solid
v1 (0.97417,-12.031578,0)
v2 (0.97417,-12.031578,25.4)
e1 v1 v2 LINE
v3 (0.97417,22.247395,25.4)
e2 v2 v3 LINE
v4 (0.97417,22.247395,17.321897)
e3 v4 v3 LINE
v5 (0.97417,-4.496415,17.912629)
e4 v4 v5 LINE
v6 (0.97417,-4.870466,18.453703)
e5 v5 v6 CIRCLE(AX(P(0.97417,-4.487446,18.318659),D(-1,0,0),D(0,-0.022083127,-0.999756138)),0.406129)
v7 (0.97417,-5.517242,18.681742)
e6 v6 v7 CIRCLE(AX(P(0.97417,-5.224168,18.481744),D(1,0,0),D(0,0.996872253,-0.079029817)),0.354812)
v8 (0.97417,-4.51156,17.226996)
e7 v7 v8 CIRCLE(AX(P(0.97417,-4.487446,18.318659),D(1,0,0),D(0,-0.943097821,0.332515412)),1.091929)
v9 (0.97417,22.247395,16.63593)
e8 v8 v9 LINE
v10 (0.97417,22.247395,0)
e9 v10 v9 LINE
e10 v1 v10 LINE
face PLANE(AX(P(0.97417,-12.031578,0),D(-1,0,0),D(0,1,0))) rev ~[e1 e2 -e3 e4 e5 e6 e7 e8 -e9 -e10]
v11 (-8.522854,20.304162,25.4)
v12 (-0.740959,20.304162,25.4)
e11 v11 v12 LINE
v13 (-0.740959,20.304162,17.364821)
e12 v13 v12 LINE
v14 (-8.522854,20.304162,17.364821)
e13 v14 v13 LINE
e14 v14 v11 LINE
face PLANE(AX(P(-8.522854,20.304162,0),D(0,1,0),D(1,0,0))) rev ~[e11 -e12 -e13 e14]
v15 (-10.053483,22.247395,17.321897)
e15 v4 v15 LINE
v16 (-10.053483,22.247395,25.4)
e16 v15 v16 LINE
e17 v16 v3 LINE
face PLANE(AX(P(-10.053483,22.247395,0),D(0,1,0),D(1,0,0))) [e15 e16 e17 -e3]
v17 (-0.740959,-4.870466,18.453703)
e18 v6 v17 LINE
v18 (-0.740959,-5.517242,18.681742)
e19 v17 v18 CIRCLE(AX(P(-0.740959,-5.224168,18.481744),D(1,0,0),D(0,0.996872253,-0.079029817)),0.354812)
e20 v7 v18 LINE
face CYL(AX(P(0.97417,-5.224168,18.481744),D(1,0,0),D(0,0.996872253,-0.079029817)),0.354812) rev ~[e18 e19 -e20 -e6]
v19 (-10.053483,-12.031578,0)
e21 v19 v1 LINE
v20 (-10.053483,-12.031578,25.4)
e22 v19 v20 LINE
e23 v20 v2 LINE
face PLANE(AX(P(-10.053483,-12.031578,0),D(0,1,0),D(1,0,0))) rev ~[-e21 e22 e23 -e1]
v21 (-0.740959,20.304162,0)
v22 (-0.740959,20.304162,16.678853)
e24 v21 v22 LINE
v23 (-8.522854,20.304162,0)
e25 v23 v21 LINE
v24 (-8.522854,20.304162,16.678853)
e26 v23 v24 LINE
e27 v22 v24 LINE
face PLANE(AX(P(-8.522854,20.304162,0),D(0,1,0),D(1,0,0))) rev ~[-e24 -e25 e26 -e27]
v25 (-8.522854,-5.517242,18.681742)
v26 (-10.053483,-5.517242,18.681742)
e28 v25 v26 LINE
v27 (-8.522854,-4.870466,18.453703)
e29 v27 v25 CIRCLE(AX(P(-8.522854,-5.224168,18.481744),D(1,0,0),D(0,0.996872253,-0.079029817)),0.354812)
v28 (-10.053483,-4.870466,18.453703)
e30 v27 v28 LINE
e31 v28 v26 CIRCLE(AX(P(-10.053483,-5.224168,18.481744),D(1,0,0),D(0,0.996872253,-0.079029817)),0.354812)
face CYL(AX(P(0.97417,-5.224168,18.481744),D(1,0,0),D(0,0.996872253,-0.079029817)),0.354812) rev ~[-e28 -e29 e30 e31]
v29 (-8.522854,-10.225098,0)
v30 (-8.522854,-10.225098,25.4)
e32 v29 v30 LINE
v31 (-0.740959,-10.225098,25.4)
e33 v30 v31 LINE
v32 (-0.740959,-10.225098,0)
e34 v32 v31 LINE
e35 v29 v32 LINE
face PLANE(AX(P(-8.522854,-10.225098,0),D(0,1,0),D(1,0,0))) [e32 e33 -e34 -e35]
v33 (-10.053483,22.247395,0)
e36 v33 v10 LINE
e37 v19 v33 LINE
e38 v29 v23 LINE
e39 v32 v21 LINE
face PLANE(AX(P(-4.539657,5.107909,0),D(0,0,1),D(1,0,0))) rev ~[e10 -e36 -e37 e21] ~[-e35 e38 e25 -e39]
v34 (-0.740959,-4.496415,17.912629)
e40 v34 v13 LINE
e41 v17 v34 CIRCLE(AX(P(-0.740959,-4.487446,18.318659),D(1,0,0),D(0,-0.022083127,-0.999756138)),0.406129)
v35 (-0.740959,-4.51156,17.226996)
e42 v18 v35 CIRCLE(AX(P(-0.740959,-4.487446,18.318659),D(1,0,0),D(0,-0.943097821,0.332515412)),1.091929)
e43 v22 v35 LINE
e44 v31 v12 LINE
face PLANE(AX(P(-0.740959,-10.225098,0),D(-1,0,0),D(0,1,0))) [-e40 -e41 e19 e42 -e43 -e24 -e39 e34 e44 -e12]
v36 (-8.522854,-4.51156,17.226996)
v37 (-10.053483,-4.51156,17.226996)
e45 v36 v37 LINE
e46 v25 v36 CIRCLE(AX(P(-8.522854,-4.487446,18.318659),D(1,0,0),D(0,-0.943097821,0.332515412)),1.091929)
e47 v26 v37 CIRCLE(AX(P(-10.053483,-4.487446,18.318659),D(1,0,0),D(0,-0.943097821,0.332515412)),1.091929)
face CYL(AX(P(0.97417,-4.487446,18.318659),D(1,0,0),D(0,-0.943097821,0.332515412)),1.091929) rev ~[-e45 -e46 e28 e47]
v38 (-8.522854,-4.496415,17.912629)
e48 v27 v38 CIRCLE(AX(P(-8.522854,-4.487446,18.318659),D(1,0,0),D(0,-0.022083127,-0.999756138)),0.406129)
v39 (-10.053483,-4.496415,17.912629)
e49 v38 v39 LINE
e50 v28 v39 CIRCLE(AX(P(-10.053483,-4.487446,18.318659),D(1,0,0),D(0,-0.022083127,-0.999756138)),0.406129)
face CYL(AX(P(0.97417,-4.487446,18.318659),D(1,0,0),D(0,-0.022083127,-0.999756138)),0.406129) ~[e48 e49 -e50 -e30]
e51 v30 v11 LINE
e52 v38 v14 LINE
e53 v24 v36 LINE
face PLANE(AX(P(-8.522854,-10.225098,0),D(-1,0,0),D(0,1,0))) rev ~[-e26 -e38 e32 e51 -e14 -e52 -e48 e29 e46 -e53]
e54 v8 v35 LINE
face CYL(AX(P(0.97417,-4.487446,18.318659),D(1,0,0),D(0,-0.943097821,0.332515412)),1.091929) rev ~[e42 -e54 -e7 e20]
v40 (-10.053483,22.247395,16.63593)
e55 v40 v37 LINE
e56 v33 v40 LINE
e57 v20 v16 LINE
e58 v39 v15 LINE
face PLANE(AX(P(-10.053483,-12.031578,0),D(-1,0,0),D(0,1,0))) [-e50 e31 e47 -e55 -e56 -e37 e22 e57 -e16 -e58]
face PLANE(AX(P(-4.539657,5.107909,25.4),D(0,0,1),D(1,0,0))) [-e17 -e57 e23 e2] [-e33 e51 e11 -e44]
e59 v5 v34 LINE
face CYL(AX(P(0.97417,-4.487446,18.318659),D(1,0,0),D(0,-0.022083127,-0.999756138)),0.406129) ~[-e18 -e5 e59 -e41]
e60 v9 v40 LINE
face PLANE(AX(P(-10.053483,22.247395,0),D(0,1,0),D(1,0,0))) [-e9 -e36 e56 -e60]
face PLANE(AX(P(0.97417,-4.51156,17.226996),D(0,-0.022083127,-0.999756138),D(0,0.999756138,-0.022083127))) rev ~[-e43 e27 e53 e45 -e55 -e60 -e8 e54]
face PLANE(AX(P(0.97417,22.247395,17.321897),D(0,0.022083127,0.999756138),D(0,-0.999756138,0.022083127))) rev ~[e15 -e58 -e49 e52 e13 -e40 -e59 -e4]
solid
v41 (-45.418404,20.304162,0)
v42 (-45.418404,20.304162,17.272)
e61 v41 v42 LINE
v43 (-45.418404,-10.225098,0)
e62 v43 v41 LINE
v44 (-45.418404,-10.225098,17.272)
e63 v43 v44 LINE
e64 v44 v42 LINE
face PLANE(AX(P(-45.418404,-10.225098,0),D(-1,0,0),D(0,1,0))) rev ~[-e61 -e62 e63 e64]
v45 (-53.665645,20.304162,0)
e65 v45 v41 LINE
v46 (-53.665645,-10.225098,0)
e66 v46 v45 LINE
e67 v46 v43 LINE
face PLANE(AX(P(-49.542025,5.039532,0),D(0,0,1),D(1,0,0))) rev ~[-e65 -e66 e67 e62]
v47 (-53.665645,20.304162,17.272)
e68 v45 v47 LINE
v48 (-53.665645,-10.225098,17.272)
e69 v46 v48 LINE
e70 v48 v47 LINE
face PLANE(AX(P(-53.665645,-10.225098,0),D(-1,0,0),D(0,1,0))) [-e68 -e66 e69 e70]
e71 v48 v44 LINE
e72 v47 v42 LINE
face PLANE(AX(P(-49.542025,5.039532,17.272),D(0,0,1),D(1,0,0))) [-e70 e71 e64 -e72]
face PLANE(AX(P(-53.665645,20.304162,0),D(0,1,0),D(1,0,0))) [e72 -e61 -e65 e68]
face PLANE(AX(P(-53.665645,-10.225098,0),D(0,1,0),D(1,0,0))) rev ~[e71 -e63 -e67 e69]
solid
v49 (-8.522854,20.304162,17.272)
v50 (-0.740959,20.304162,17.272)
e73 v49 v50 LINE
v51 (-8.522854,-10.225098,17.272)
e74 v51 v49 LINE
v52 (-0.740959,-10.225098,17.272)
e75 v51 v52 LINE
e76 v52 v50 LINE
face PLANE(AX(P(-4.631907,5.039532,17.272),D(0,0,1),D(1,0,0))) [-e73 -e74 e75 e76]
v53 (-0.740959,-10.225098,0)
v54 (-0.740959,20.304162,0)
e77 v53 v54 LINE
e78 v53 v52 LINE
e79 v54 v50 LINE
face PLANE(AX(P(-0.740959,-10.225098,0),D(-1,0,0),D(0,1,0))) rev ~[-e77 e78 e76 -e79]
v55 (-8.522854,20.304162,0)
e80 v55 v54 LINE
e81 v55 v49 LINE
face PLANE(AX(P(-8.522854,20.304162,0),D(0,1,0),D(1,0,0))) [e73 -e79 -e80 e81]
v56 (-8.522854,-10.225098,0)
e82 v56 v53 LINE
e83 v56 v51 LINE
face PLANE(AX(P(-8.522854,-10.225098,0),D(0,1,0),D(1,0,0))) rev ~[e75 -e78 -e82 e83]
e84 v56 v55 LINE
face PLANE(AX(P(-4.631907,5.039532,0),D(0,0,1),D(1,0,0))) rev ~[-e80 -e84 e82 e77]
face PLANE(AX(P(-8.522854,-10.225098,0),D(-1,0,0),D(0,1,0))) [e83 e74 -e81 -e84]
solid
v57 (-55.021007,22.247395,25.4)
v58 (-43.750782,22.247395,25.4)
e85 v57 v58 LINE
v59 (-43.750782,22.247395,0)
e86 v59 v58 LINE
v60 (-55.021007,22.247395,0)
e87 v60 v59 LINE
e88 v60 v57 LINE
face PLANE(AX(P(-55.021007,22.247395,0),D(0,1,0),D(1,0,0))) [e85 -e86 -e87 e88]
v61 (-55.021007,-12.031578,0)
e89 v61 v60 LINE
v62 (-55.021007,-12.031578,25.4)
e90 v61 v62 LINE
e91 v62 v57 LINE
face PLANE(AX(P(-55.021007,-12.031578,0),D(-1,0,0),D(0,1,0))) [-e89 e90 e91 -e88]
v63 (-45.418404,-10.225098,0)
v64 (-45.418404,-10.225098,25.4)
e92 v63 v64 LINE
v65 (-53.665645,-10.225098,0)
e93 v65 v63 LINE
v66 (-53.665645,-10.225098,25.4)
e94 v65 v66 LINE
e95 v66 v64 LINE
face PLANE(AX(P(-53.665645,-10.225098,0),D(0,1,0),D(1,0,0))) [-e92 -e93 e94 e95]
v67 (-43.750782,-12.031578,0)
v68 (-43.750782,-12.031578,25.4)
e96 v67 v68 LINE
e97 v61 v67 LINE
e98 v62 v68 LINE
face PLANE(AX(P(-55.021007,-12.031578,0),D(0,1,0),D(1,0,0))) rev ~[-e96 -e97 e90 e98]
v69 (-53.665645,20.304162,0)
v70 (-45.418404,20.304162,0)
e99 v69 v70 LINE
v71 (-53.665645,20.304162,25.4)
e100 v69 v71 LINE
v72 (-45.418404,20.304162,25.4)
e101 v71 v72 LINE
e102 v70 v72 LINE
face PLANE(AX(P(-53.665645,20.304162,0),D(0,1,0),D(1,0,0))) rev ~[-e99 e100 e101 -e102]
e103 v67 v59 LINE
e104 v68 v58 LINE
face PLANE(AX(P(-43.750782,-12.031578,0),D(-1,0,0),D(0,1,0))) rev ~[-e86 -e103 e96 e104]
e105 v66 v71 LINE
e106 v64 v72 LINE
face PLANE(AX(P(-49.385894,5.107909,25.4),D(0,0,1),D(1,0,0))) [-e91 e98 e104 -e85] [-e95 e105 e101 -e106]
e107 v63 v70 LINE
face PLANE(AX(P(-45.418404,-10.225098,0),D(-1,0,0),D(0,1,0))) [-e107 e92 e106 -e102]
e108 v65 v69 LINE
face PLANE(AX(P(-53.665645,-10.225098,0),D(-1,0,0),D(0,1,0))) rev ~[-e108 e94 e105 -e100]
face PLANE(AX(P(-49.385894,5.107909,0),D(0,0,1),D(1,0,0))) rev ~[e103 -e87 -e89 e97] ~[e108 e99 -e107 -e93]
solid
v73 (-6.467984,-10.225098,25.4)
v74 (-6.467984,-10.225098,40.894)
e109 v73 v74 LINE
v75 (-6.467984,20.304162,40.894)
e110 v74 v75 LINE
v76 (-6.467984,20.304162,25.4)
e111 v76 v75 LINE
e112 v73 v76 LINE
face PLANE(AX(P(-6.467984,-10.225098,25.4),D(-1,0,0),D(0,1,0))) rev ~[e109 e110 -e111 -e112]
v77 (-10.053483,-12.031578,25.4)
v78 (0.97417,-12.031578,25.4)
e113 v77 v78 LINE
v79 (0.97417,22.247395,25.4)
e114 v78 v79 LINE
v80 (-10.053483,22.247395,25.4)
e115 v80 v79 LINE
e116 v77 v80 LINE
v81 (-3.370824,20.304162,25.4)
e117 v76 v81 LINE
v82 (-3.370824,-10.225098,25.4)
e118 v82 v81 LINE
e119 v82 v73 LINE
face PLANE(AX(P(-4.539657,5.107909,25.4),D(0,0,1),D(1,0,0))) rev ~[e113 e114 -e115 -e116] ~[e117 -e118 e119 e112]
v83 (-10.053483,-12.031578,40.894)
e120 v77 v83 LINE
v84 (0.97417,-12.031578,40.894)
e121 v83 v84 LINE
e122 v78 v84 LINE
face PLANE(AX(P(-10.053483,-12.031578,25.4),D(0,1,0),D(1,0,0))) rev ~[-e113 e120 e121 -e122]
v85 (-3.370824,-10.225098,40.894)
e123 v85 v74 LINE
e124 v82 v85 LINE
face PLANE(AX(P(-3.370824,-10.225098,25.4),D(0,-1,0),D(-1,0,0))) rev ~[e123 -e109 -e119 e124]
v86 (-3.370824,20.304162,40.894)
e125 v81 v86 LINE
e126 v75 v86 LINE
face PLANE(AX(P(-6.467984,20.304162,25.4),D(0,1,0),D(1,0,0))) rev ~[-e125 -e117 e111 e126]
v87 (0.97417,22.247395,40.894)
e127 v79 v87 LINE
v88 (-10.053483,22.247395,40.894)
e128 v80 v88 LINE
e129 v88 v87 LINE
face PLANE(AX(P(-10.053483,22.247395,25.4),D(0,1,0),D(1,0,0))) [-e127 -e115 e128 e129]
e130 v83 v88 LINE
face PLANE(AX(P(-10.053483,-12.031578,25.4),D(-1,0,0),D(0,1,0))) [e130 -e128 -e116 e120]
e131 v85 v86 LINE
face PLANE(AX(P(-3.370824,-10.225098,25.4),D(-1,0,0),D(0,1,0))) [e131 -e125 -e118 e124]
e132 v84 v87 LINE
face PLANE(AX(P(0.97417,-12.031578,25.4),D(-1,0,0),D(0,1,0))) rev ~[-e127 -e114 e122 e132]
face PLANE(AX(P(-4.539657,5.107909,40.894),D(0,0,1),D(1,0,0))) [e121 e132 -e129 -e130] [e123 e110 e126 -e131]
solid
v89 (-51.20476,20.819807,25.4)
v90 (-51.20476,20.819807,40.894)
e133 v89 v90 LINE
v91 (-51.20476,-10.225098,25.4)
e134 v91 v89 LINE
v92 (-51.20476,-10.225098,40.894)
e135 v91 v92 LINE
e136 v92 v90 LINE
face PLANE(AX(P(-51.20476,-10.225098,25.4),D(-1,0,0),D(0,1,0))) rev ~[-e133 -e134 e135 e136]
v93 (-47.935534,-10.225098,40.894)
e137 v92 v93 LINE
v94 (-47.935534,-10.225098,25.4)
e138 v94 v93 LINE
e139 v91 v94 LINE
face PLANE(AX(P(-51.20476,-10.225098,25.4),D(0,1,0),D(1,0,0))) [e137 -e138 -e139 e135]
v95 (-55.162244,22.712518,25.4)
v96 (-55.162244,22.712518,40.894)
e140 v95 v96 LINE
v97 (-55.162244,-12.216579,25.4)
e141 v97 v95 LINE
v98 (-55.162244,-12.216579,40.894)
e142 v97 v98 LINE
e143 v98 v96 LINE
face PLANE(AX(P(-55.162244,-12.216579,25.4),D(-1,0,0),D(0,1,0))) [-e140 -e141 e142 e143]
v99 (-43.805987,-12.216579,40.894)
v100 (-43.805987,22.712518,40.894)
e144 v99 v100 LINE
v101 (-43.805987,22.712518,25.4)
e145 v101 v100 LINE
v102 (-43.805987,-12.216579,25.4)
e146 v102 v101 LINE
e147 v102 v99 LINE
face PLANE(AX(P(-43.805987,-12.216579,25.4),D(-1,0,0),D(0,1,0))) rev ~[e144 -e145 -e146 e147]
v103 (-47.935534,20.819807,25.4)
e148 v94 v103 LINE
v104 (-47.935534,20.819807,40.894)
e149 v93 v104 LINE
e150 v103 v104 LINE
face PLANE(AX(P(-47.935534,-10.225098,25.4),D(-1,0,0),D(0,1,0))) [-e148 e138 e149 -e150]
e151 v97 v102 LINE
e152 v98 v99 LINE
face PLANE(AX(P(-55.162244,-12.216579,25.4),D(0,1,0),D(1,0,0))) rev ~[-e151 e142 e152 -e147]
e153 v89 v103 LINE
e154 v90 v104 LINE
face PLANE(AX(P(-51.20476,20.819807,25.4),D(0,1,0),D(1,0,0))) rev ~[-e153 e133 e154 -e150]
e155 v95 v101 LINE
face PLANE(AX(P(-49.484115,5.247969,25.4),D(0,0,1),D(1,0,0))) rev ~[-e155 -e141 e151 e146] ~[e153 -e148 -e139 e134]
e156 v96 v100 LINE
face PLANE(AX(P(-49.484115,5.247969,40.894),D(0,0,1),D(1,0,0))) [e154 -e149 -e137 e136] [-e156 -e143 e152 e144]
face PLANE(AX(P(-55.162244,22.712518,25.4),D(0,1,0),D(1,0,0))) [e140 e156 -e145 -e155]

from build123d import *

# Parameters (mm, degrees)
F0_W     = 11.2702250481
F0_H     = 34.278973937
F0_W_2   = 8.2472413778
F0_H_2   = 30.5292597041
F1_DEPTH = 25.4
F0_W_3   = 11.0276525375
F0_W_4   = 7.7818950522
F2_DEPTH = 17.272
F3_W     = 11.0276525375
F3_H     = 34.278973937
F3_W_2   = 2.629864437
F3_H_2   = 30.5292597041
F3_W_3   = 2.0548701286
F4_DEPTH = 15.494
F3_W_4   = 11.3562569022
F3_H_3   = 34.9290966988
F3_W_5   = 3.269225359
F3_H_4   = 31.0449050739
F6_DEPTH = 59.182


with BuildPart() as f1:
    # F0 (on Top) → F1 (new body)
    with BuildSketch(Plane.XY):
        with Locations((-49.3858940899, 5.1079085097)):
            Rectangle(F0_W, F0_H)
        with Locations((-49.5420247316, 5.0395322032)):
            Rectangle(F0_W_2, F0_H_2, mode=Mode.SUBTRACT)
    extrude(amount=F1_DEPTH)


with BuildPart() as f1b:
    # F0 (on Top) → F1, piece 2 (new body)
    with BuildSketch(Plane.XY):
        with Locations((-4.5396565692, 5.1079085097)):
            Rectangle(F0_W_3, F0_H)
        with Locations((-4.6319066605, 5.0395322032)):
            Rectangle(F0_W_4, F0_H_2, mode=Mode.SUBTRACT)
    extrude(amount=F1_DEPTH)

    # F5 (on face) → F6 (cut)
    with BuildSketch(Plane.YZ.offset(0.9741696995)):
        with BuildLine():
            Line((-4.5115595148, 17.2269957008), (22.2473954782, 16.6359301656))
            Line((22.2473954782, 16.6359301656), (22.2473954782, 17.3218974883))
            Line((22.2473954782, 17.3218974883), (-4.4964149055, 17.9126285015))
            ThreePointArc((-4.4964149055, 17.9126285015), (-4.8215182289, 18.0877108855), (-4.870465867, 18.453702881))
            ThreePointArc((-4.870465867, 18.453702881), (-5.106187809, 18.8163662832), (-5.5172423918, 18.6817419644))
            ThreePointArc((-5.5172423918, 18.6817419644), (-5.3856405338, 17.6977266272), (-4.5115595148, 17.2269957008))
        make_face()
    extrude(amount=-F6_DEPTH, mode=Mode.SUBTRACT)


with BuildPart() as f2:
    # F0 (on Top) → F2 (new body)
    with BuildSketch(Plane.XY):
        with Locations((-4.6319066605, 5.0395322032)):
            Rectangle(F0_W_4, F0_H_2)
    extrude(amount=F2_DEPTH)


with BuildPart() as f2b:
    # F0 (on Top) → F2, piece 2 (new body)
    with BuildSketch(Plane.XY):
        with Locations((-49.5420247316, 5.0395322032)):
            Rectangle(F0_W_2, F0_H_2)
    extrude(amount=F2_DEPTH)


with BuildPart() as f4:
    # F3 (on face) → F4 (new body)
    with BuildSketch(Plane.XY.offset(25.4)):
        with Locations((-4.5396565692, 5.1079085097)):
            Rectangle(F3_W, F3_H)
        Polygon((-8.5228541866, 20.3041620553), (-6.467984058, 20.3041620553), (-3.3708235715, 20.3041620553), (-0.7409591344, 20.3041620553), (-0.7409591344, -10.2250976488), (-3.3708235715, -10.2250976488), (-6.467984058, -10.2250976488), (-8.5228541866, -10.2250976488), align=None, mode=Mode.SUBTRACT)
        with Locations((-2.0558913529, 5.0395322032)):
            Rectangle(F3_W_2, F3_H_2)
        with Locations((-7.4954191223, 5.0395322032)):
            Rectangle(F3_W_3, F3_H_2)
    extrude(amount=F4_DEPTH)


with BuildPart() as f4b:
    # F3 (on face) → F4, piece 2 (new body)
    with BuildSketch(Plane.XY.offset(25.4)):
        with Locations((-49.4841150939, 5.2479691803)):
            Rectangle(F3_W_4, F3_H_3)
        with Locations((-49.5701469481, 5.2973548882)):
            Rectangle(F3_W_5, F3_H_4, mode=Mode.SUBTRACT)
    extrude(amount=F4_DEPTH)


solid = Compound([f1.part, f1b.part, f2.part, f2b.part, f4.part, f4b.part])
